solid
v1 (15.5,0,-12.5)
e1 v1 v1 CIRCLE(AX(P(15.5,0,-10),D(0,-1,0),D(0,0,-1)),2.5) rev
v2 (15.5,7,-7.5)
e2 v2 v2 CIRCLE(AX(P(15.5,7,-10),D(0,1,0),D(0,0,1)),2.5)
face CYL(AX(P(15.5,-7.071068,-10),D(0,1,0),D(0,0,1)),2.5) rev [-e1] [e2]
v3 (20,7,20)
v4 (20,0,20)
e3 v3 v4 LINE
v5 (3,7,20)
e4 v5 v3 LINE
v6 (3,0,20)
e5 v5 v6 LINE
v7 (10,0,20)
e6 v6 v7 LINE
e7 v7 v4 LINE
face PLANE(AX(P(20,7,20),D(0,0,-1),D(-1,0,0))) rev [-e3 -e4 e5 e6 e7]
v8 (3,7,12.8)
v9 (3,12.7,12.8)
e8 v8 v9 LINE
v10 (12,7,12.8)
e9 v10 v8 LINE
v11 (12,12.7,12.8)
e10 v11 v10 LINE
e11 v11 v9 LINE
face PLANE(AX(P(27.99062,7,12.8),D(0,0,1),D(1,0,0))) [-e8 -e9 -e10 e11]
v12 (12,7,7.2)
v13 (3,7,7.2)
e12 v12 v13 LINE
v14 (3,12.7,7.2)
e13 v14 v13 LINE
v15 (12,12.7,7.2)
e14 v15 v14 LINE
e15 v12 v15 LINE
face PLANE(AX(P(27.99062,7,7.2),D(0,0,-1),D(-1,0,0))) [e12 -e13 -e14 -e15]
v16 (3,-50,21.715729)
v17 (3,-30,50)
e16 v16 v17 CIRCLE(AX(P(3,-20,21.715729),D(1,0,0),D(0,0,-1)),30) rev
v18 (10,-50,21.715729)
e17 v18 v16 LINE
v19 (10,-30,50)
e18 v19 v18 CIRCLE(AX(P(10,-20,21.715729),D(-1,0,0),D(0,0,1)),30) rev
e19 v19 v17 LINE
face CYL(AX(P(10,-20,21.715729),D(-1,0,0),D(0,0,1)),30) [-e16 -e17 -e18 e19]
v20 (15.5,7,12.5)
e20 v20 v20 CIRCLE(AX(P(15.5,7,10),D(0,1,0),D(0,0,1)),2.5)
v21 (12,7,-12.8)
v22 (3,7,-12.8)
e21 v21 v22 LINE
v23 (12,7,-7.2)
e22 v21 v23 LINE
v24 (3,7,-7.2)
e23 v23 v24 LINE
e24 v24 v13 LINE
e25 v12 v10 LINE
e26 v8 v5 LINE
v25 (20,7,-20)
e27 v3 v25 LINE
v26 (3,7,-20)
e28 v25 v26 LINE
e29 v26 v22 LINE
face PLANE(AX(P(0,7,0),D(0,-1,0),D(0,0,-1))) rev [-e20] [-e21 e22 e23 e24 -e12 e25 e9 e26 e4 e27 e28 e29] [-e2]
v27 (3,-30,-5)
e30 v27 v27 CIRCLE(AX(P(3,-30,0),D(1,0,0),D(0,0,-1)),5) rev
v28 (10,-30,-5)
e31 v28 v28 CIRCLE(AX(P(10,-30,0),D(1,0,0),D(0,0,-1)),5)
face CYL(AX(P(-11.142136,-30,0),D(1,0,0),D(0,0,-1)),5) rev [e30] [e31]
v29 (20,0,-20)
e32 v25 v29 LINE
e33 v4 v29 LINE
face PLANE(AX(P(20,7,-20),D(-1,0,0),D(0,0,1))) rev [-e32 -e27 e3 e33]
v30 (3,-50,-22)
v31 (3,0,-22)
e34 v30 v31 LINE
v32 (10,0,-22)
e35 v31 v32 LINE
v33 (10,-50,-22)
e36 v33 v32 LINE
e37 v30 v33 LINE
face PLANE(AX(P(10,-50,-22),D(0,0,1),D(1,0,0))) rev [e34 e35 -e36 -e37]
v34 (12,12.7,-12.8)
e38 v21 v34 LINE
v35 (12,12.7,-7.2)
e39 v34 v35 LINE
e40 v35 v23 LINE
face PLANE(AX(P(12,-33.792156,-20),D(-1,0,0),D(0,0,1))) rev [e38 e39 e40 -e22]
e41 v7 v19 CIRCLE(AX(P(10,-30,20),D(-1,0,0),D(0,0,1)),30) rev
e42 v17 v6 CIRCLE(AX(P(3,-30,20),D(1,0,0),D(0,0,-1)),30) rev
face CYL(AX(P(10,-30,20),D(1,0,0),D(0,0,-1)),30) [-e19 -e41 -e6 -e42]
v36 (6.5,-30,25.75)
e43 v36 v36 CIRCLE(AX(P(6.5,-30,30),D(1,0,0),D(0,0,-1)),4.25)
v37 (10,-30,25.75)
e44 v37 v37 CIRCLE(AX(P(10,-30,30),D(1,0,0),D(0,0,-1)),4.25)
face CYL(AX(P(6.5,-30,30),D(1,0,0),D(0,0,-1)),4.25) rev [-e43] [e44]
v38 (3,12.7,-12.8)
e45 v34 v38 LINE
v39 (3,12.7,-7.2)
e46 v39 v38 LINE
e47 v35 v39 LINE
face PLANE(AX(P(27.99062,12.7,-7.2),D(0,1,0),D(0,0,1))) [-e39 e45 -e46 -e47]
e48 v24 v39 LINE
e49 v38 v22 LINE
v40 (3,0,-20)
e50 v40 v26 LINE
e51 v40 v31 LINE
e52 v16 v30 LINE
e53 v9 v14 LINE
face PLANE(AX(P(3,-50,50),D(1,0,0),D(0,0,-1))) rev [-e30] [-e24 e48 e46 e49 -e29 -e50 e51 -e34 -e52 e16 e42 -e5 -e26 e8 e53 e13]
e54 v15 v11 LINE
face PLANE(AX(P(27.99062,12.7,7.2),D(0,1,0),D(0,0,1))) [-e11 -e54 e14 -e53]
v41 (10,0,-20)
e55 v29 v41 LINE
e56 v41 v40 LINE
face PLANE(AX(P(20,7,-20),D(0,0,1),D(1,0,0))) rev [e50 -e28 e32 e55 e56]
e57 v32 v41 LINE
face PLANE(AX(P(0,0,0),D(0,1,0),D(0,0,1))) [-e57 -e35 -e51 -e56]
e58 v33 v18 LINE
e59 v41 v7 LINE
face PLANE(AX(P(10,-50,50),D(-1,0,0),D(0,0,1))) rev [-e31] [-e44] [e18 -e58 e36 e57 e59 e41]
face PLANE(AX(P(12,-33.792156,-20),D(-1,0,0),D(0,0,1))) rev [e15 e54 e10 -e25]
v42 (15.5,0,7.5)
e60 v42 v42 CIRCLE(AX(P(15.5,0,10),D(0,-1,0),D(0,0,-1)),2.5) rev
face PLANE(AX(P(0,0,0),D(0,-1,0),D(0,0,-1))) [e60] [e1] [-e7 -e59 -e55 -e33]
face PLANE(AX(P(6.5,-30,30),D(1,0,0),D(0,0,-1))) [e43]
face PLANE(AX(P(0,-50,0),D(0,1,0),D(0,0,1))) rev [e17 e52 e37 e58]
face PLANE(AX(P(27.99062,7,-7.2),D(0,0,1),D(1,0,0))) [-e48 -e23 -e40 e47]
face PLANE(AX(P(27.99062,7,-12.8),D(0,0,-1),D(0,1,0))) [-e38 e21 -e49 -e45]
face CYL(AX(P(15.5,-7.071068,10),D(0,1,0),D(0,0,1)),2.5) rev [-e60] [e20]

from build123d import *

# Parameters (mm, degrees)
CROQUIS1_W              = 40
CROQUIS1_H              = 40
SALIENTE_EXTRUIR1_DEPTH = 7
CROQUIS3_W              = 5.6
CROQUIS3_H              = 5.7
SALIENTE_EXTRUIR3_DEPTH = 40
CROQUIS19_W             = 8
CROQUIS19_H             = 40
CORTAR_EXTRUIR5_DEPTH   = 5.7
CROQUIS20_R             = 2.5
CORTAR_EXTRUIR6_DEPTH   = 7
CROQUIS21_W             = 7
CROQUIS21_H             = 72
SALIENTE_EXTRUIR4_DEPTH = 50
CROQUIS22_R             = 5
CORTAR_EXTRUIR7_DEPTH   = 7
CROQUIS25_R             = 4.25
CORTAR_EXTRUIR8_DEPTH   = 3.5
REDONDEO1_R             = 30
REDONDEO2_R             = 30
CROQUIS29_W             = 103.753326912
CROQUIS29_H             = 179.412983462
CORTAR_EXTRUIR9_DEPTH   = 23


# Some blends are built 0.0001 mm under size
with BuildPart() as part:
    # Croquis1 → Saliente-Extruir1 (new body)
    with BuildSketch(Plane(origin=(0, 0, 0), x_dir=(1, 0, 0), z_dir=(0, 1, 0))):
        Rectangle(CROQUIS1_W, CROQUIS1_H)
    extrude(amount=SALIENTE_EXTRUIR1_DEPTH)

    # Croquis3 → Saliente-Extruir3 (add)
    with BuildSketch(Plane.ZY.offset(20)):
        with Locations((10, 9.85)):
            Rectangle(CROQUIS3_W, CROQUIS3_H)
        with Locations((-10, 9.85)):
            Rectangle(CROQUIS3_W, CROQUIS3_H)
    extrude(amount=-SALIENTE_EXTRUIR3_DEPTH)

    # Croquis19 → Cortar-Extruir5 (cut)
    with BuildSketch(Plane(origin=(0, 12.7, 0), x_dir=(1, 0, 0), z_dir=(0, 1, 0))):
        with Locations((-16, 0)):
            Rectangle(CROQUIS19_W, CROQUIS19_H)
        with Locations((16, 0)):
            Rectangle(CROQUIS19_W, CROQUIS19_H)
    extrude(amount=-CORTAR_EXTRUIR5_DEPTH, mode=Mode.SUBTRACT)

    # Croquis20 → Cortar-Extruir6 (cut)
    with BuildSketch(Plane(origin=(0, 7, 0), x_dir=(1, 0, 0), z_dir=(0, 1, 0))):
        with Locations(Location((-15.5, 10, 0), (0, 0, 270))):
            Circle(CROQUIS20_R)
        with Locations(Location((15.5, 10, 0), (0, 0, 270))):
            Circle(CROQUIS20_R)
        with Locations(Location((15.5, -10, 0), (0, 0, 270))):
            Circle(CROQUIS20_R)
        with Locations(Location((-15.5, -10, 0), (0, 0, 270))):
            Circle(CROQUIS20_R)
    extrude(amount=-CORTAR_EXTRUIR6_DEPTH, mode=Mode.SUBTRACT)

    # Croquis21 → Saliente-Extruir4 (add)
    with BuildSketch(Plane.XZ):
        with Locations((6.5, 14)):
            Rectangle(CROQUIS21_W, CROQUIS21_H)
    extrude(amount=SALIENTE_EXTRUIR4_DEPTH)

    # Croquis22 → Cortar-Extruir7 (cut)
    with BuildSketch(Plane(origin=(10, 0, 0), x_dir=(0, 0, -1), z_dir=(1, 0, 0))):
        with Locations((0, -30)):
            Circle(CROQUIS22_R)
    extrude(amount=-CORTAR_EXTRUIR7_DEPTH, mode=Mode.SUBTRACT)

    # Croquis25 → Cortar-Extruir8 (cut)
    with BuildSketch(Plane(origin=(10, 0, 0), x_dir=(0, 0, -1), z_dir=(1, 0, 0))):
        with Locations((-30, -30)):
            Circle(CROQUIS25_R)
    extrude(amount=-CORTAR_EXTRUIR8_DEPTH, mode=Mode.SUBTRACT)

    # Redondeo1
    redondeo1_edges = [part.edges().sort_by_distance(p)[0] for p in [
        (6.5, 0, 50),
    ]]
    fillet(redondeo1_edges, radius=REDONDEO1_R - 0.0001)  # a hair under: the kernel refuses the full size

    # Redondeo2
    # the kernel refuses this fillet: 30 mm, written as the material it takes off along each edge
    with BuildSketch(Plane(origin=(80.710766507, -50, 50), x_dir=(0, 1, 0), z_dir=(-1, 0, 0))) as redondeo2_piece_1:
        with BuildLine():
            CenterArc((30, 28.284306603), REDONDEO2_R, 180, 70.528981937)
            Line((0, 28.284306603), (-0.6, 28.284306603))
            Line((-0.6, 28.284306603), (-0.6, 0))
            Line((-0.6, 0), (0, -0.6))
            ThreePointArc((0, -0.6), (10.00005, -0.6), (19.800102, -0.565686132))
            Line((19.800102, -0.565686132), (20.0001, 0))
        make_face()
    extrude(amount=148.421533013, mode=Mode.SUBTRACT)

    # Croquis29 → Cortar-Extruir9 (cut)
    with BuildSketch(Plane.ZY.offset(20)):
        Rectangle(CROQUIS29_W, CROQUIS29_H)
    extrude(amount=-CORTAR_EXTRUIR9_DEPTH, mode=Mode.SUBTRACT)


solid = part.part
